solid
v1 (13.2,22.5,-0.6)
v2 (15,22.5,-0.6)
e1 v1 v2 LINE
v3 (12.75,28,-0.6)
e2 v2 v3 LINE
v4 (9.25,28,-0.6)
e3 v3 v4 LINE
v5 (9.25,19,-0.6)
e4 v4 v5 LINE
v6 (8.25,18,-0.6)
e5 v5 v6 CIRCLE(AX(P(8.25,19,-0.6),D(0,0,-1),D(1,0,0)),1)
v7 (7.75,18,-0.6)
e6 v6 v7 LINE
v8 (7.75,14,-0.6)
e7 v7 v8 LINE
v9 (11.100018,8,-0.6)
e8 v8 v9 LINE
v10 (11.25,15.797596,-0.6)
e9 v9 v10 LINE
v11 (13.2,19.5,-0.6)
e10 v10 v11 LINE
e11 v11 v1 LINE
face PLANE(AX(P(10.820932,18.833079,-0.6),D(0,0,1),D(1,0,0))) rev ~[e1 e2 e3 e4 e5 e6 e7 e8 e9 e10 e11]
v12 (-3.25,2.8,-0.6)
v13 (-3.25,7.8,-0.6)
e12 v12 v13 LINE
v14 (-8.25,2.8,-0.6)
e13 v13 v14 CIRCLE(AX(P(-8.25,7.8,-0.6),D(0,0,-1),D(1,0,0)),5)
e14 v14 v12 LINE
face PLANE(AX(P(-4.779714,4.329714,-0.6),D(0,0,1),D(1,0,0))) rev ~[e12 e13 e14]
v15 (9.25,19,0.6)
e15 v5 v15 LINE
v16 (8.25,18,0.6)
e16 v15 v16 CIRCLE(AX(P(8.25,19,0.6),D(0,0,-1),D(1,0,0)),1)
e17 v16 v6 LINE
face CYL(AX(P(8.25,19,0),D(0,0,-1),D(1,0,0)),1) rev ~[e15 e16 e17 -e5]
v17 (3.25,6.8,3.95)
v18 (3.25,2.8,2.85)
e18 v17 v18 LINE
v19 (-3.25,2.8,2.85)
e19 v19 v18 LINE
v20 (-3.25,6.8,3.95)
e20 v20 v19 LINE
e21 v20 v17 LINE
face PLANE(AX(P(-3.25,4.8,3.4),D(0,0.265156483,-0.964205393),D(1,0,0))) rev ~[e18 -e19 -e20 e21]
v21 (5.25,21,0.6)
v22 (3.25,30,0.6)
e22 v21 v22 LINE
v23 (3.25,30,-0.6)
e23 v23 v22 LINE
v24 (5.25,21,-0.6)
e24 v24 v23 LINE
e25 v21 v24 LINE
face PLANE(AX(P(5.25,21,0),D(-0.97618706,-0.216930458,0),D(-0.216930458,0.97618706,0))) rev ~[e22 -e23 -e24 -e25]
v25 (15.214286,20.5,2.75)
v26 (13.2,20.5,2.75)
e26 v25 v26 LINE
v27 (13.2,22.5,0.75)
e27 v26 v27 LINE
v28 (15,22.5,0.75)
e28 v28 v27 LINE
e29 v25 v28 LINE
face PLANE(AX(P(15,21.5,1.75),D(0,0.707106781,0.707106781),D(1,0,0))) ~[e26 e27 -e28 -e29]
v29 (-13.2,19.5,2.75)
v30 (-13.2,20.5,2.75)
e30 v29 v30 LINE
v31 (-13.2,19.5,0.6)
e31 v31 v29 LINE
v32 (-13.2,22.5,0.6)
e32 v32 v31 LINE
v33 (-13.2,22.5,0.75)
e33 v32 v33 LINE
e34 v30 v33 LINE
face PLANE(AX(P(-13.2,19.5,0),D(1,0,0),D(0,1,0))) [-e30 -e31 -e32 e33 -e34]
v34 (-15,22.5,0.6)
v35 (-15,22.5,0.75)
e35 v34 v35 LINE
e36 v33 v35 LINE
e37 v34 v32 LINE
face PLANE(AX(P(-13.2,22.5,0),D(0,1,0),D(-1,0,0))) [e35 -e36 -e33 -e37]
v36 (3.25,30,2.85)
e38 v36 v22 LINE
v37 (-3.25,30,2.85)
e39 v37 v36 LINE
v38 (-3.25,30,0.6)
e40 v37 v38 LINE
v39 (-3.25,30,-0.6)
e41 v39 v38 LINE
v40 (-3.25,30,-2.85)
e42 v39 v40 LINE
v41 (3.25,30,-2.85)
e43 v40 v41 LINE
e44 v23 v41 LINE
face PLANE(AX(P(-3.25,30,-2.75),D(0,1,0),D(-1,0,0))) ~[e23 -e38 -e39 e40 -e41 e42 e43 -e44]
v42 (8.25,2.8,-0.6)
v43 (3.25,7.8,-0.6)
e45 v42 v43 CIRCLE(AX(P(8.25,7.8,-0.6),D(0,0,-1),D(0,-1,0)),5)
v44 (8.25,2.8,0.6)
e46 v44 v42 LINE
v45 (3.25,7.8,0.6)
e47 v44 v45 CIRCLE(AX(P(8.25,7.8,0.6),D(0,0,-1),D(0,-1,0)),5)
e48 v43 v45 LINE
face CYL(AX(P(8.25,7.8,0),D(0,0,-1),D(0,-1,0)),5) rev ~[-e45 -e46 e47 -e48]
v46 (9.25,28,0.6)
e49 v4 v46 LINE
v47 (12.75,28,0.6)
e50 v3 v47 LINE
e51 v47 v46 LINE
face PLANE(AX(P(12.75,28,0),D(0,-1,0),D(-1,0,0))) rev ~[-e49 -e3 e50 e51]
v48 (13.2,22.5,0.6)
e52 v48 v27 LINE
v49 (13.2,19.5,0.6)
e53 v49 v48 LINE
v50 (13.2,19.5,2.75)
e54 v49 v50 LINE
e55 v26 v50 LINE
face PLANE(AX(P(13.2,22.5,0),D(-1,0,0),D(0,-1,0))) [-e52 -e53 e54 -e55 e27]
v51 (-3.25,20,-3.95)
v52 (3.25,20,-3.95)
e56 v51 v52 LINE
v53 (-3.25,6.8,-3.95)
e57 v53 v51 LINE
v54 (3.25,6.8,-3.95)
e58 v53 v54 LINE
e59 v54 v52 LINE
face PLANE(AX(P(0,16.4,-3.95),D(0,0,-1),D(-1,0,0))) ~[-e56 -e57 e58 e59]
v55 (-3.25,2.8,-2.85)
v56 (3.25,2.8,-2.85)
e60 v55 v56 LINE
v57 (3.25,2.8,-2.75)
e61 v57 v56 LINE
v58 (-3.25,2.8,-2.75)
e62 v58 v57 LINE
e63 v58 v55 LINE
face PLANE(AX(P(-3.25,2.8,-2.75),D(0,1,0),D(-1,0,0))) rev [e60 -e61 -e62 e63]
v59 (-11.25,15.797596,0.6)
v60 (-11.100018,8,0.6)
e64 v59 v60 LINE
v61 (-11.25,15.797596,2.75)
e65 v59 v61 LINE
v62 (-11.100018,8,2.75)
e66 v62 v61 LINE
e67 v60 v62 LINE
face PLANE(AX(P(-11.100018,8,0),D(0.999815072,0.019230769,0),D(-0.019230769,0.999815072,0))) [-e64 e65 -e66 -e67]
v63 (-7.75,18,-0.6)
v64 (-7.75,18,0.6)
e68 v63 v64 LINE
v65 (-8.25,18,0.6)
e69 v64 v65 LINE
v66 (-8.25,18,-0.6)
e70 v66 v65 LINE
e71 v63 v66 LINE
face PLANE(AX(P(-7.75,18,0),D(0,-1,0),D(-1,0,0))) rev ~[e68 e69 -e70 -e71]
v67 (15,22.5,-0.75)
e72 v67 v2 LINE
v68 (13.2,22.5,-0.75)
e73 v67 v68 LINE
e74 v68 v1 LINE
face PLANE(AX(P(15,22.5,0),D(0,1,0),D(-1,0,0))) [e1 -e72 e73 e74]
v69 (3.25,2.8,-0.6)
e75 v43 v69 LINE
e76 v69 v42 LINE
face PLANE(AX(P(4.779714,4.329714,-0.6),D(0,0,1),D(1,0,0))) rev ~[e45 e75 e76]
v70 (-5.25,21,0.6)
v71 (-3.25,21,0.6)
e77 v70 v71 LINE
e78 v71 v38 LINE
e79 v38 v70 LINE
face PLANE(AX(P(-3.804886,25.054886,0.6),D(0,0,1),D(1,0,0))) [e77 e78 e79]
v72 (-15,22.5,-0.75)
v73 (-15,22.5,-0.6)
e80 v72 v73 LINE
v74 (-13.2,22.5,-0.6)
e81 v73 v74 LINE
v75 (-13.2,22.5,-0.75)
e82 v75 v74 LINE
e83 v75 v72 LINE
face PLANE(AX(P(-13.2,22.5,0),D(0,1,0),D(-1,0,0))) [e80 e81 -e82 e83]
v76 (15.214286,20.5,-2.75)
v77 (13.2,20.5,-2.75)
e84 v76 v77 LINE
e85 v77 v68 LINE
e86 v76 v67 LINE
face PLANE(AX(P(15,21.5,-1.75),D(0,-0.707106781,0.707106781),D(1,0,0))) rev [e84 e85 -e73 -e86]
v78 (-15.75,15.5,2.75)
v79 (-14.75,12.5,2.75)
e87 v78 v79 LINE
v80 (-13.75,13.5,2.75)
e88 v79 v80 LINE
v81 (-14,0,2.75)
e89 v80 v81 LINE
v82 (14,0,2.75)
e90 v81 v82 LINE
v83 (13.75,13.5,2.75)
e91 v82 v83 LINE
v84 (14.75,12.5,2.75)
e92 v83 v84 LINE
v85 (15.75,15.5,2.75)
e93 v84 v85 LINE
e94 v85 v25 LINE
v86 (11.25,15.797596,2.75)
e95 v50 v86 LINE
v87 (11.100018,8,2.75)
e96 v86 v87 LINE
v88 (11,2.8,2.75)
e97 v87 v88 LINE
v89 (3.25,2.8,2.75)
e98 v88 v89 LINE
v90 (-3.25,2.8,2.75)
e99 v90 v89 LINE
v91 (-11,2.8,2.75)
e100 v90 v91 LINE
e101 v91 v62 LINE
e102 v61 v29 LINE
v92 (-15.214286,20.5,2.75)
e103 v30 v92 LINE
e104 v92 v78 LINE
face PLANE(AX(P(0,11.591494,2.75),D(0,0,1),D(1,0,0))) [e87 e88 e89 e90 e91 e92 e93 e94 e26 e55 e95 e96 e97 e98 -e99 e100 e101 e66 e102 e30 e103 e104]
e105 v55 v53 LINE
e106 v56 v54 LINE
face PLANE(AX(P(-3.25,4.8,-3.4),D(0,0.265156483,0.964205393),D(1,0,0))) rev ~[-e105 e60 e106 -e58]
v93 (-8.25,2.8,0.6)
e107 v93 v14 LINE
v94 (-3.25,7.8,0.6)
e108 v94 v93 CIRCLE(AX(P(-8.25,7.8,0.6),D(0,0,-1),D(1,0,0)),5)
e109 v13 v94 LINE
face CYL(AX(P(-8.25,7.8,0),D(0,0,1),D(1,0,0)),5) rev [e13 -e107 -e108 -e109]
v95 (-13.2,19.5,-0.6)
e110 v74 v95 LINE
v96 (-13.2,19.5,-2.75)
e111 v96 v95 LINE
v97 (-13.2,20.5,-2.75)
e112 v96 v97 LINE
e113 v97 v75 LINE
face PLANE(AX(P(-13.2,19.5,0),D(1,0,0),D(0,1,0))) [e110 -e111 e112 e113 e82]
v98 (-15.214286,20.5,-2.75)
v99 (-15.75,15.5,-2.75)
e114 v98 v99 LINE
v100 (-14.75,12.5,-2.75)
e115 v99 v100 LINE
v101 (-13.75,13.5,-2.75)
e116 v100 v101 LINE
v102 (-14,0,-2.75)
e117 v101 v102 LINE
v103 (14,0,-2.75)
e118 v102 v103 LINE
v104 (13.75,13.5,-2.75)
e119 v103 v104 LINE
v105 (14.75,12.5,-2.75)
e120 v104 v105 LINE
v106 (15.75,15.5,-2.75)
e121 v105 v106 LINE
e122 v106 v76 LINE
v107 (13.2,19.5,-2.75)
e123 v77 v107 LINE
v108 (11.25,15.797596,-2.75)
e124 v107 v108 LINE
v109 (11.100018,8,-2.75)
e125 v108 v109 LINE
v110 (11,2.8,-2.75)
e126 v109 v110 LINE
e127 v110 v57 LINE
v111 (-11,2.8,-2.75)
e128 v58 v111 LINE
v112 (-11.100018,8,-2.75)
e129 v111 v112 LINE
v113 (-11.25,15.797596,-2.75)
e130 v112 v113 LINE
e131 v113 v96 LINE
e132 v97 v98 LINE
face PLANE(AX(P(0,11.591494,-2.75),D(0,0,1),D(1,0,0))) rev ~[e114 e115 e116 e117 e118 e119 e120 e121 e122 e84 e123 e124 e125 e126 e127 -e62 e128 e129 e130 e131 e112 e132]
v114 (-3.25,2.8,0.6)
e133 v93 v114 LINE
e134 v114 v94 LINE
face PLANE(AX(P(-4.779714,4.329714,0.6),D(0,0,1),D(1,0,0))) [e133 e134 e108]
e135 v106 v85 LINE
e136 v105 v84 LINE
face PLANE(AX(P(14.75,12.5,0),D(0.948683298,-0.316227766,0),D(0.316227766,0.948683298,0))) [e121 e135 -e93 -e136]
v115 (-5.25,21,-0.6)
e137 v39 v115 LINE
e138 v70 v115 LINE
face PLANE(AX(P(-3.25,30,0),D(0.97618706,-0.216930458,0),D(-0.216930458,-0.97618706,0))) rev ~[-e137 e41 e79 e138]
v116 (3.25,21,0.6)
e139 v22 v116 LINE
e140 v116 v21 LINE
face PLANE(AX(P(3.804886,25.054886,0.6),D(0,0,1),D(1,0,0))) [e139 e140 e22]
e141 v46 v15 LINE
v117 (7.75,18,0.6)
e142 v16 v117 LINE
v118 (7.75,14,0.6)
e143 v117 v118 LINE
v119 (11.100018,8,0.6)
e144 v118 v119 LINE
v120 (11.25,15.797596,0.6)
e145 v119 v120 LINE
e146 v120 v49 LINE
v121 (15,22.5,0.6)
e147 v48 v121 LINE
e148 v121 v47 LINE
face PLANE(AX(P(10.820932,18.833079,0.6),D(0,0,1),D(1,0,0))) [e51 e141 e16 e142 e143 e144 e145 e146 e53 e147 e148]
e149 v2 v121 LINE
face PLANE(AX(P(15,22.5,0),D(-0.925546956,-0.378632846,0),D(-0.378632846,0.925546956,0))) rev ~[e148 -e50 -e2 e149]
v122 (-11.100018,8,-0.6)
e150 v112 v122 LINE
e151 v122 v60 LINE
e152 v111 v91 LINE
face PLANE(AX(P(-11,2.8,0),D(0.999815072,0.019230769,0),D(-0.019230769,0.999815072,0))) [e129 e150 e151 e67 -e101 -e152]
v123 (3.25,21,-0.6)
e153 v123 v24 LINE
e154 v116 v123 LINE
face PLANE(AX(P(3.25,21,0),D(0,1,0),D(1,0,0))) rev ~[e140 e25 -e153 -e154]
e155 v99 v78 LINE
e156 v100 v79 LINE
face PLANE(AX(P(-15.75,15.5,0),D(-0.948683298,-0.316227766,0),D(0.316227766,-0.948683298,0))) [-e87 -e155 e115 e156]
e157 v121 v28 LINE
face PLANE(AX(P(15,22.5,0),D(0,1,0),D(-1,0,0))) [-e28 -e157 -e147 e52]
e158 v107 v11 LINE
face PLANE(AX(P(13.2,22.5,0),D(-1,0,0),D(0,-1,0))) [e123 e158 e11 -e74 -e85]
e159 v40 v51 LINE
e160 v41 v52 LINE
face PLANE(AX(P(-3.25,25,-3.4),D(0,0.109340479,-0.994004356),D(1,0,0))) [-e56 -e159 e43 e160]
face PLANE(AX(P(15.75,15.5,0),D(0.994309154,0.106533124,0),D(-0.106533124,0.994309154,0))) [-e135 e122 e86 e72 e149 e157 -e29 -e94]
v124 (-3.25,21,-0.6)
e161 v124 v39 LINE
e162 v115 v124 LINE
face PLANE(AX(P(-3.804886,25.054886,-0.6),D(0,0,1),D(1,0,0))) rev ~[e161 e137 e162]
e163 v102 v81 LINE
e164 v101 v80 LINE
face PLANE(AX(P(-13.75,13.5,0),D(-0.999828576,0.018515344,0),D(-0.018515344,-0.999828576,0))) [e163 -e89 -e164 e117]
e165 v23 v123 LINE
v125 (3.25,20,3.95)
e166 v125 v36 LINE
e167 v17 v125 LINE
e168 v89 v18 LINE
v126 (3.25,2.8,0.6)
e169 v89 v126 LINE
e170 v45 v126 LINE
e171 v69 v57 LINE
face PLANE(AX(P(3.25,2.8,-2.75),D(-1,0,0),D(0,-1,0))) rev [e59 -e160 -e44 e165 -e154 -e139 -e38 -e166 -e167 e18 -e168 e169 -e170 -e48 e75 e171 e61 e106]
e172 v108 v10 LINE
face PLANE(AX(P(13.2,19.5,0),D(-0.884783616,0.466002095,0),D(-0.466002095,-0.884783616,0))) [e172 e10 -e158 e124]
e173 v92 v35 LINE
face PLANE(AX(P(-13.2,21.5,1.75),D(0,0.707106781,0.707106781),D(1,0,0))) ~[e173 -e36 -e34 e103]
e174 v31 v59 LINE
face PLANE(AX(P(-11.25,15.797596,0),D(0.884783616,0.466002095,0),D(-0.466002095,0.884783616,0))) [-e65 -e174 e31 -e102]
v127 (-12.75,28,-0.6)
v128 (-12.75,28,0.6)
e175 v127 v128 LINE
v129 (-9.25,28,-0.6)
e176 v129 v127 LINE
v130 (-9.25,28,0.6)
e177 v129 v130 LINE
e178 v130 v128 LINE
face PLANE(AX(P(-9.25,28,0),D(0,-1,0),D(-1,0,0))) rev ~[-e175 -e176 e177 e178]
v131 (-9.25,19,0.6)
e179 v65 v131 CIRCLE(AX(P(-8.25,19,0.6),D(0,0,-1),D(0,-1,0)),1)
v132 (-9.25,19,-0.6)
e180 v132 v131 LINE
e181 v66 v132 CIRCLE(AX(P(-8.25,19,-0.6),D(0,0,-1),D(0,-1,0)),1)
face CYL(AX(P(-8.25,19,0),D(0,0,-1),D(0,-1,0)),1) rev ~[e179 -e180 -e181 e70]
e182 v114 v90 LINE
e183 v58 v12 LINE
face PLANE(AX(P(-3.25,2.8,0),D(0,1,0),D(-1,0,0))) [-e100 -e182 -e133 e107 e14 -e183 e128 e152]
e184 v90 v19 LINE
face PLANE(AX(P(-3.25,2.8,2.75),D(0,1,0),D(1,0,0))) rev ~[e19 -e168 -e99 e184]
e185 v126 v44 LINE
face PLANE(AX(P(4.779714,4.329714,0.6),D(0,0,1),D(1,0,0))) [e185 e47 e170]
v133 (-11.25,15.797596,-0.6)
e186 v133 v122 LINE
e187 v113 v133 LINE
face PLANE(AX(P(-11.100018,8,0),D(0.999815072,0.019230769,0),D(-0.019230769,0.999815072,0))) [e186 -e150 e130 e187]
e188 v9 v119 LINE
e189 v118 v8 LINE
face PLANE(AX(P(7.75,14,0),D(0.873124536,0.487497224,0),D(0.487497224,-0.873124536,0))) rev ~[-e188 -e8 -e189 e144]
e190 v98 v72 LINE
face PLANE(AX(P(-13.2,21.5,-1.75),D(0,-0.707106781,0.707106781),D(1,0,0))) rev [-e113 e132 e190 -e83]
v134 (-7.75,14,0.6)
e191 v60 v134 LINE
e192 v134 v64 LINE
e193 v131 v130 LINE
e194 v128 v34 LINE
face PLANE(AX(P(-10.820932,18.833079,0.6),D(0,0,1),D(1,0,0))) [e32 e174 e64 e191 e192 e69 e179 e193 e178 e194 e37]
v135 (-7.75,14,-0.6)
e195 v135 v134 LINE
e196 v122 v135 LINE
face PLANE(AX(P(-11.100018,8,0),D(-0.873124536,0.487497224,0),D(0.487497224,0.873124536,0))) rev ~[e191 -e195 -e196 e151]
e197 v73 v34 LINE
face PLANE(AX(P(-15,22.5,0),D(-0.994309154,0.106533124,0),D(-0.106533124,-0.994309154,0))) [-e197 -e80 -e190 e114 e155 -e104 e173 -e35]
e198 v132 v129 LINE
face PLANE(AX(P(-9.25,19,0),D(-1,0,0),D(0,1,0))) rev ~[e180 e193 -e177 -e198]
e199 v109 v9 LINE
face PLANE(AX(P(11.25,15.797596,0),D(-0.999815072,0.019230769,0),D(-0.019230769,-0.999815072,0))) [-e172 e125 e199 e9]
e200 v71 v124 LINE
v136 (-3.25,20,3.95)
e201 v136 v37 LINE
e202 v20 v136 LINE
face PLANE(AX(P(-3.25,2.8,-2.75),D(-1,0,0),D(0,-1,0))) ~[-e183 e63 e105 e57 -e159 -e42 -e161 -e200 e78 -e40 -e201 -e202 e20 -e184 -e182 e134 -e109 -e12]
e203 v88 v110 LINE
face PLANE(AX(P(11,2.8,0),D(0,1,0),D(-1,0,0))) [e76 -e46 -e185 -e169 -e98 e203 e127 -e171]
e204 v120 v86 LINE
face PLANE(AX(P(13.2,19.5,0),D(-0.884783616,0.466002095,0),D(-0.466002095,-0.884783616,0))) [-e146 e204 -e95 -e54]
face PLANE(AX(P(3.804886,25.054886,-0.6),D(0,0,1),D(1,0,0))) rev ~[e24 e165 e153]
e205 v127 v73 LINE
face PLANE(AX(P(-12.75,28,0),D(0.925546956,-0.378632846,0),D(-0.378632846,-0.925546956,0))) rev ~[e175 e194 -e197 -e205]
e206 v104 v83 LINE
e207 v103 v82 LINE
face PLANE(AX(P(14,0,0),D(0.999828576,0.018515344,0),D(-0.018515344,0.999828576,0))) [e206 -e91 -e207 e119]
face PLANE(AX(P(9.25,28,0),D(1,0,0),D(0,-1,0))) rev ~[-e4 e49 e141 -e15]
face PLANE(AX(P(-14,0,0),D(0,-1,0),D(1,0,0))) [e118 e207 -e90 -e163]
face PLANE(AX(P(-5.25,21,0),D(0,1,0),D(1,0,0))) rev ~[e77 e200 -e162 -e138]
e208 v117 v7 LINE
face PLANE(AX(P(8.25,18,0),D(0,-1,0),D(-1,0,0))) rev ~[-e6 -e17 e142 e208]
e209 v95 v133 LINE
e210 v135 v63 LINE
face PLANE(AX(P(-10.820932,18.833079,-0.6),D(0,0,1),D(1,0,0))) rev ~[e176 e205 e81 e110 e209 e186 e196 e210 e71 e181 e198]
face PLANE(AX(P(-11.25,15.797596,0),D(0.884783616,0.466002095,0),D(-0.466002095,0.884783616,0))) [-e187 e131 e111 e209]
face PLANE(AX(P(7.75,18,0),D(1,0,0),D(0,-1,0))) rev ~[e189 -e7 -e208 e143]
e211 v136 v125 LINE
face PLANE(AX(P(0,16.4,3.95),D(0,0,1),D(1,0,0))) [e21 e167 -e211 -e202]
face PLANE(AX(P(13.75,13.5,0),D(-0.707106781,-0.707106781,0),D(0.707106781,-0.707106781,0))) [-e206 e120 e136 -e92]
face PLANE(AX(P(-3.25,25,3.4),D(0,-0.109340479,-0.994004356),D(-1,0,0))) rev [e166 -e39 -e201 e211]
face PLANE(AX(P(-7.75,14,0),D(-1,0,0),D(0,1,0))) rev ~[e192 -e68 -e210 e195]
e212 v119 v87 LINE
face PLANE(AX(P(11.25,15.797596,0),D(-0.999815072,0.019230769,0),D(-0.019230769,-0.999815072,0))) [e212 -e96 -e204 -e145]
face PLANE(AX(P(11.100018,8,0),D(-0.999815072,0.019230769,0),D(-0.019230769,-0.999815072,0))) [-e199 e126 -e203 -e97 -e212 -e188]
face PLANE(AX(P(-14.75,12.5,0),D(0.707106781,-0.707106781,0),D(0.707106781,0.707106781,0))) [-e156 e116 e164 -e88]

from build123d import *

# Parameters (mm, degrees)
F1_DEPTH    = 2.75
F2_DEPTH    = 0.6
F3_SIZE     = 2
F4_W        = 6.5
F4_H        = 27.2
F5_DEPTH    = 1.2
F6_C1_SIZE2 = 4
F6_C1_SIZE  = 1.1
F6_C2_SIZE2 = 1.1
F6_C2_SIZE  = 4
F7_C1_SIZE2 = 1.1
F7_C1_SIZE  = 10
F7_C2_SIZE2 = 10
F7_C2_SIZE  = 1.1


# Not quite as in the source:
# - a pattern or mirror of a feature is missing from the dataset's text; its kind, count and spacing are read off the source's solid


with BuildPart() as f1:
    # F0 (on Top) → F1 (new body, symmetric)
    with BuildSketch(Plane.XY):
        Polygon((3.25, 30), (0, 30), (-3.25, 30), (-3.25, 21), (-3.25, 7.8), (-3.25, 2.8), (-8.25, 2.8), (-11, 2.8), (-11.1000184963, 8), (-11.25, 15.7975959316), (-13.2, 19.5), (-13.2, 22.5), (-15, 22.5), (-15.75, 15.5), (-14.75, 12.5), (-13.75, 13.5), (-14, 0), (0, 0), (14, 0), (13.75, 13.5), (14.75, 12.5), (15.75, 15.5), (15, 22.5), (13.2, 22.5), (13.2, 19.5), (11.25, 15.7975959316), (11.1000184963, 8), (11, 2.8), (8.25, 2.8), (3.25, 2.8), (3.25, 7.8), (3.25, 21), align=None)
    extrude(amount=F1_DEPTH, both=True)

    # F0 (on Top) → F2 (join, symmetric)
    with BuildSketch(Plane.XY):
        with BuildLine():
            Line((-11.25, 15.7975959316), (-11.1000184963, 8))
            Line((-11.1000184963, 8), (-7.75, 14))
            Line((-7.75, 14), (-7.75, 18))
            Line((-7.75, 18), (-8.25, 18))
            ThreePointArc((-8.25, 18), (-8.9571067812, 18.2928932188), (-9.25, 19))
            Line((-9.25, 19), (-9.25, 28))
            Line((-9.25, 28), (-12.75, 28))
            Line((-12.75, 28), (-15, 22.5))
            Line((-15, 22.5), (-13.2, 22.5))
            Line((-13.2, 22.5), (-13.2, 19.5))
            Line((-13.2, 19.5), (-11.25, 15.7975959316))
        make_face()
        Polygon((-3.25, 21), (-3.25, 30), (-5.25, 21), align=None)
        Polygon((5.25, 21), (3.25, 30), (3.25, 21), align=None)
        with BuildLine():
            Line((7.75, 14), (11.1000184963, 8))
            Line((11.1000184963, 8), (11.25, 15.7975959316))
            Line((11.25, 15.7975959316), (13.2, 19.5))
            Line((13.2, 19.5), (13.2, 22.5))
            Line((13.2, 22.5), (15, 22.5))
            Line((15, 22.5), (12.75, 28))
            Line((12.75, 28), (9.25, 28))
            Line((9.25, 28), (9.25, 19))
            ThreePointArc((9.25, 19), (8.9571067812, 18.2928932188), (8.25, 18))
            Line((8.25, 18), (7.75, 18))
            Line((7.75, 18), (7.75, 14))
        make_face()
        with BuildLine():
            ThreePointArc((8.25, 2.8), (4.7144660941, 4.2644660941), (3.25, 7.8))
            Line((3.25, 7.8), (3.25, 2.8))
            Line((3.25, 2.8), (8.25, 2.8))
        make_face()
        with BuildLine():
            Line((-3.25, 2.8), (-3.25, 7.8))
            ThreePointArc((-3.25, 7.8), (-4.7144660941, 4.2644660941), (-8.25, 2.8))
            Line((-8.25, 2.8), (-3.25, 2.8))
        make_face()
    extrude(amount=F2_DEPTH, both=True)

    # F3
    f3_edges = [f1.edges().sort_by_distance(p)[0] for p in [
        (14.1, 22.5, 2.75),
        (14.1, 22.5, -2.75),
        (-14.1, 22.5, 2.75),
        (-14.1, 22.5, -2.75),
    ]]
    chamfer(f3_edges, length=F3_SIZE)

    # F4 (on face) → F5 (join)
    with BuildSketch(Plane.XY.offset(2.75)):
        with Locations((0, 16.4)):
            Rectangle(F4_W, F4_H)
    f5 = extrude(amount=F5_DEPTH)

    # F5_copies: F5 across plane
    add(f5.mirror(Plane(origin=(0, 0, 0), x_dir=(-1, 0, 0), z_dir=(0, 0, -1))))

    # F6: chamfer of 4 x 1.1 on 2 edges, made by hand

    # F6_c1
    f6_c1_edges = [f1.edges().sort_by_distance(p)[0] for p in [
        (0, 2.8, -3.95),
    ]]
    f6_c1_side = f1.faces().sort_by_distance((0, 2.8, -3.928))[0]
    chamfer(f6_c1_edges, length=F6_C1_SIZE, length2=F6_C1_SIZE2, reference=f6_c1_side)

    # F6_c2
    f6_c2_edges = [f1.edges().sort_by_distance(p)[0] for p in [
        (0, 2.8, 3.95),
    ]]
    f6_c2_side = f1.faces().sort_by_distance((0, 2.822, 3.95))[0]
    chamfer(f6_c2_edges, length=F6_C2_SIZE, length2=F6_C2_SIZE2, reference=f6_c2_side)

    # F7: chamfer of 1.1 x 10 on 2 edges, made by hand

    # F7_c1
    f7_c1_edges = [f1.edges().sort_by_distance(p)[0] for p in [
        (0, 30, 3.95),
    ]]
    f7_c1_side = f1.faces().sort_by_distance((0, 29.978, 3.95))[0]
    chamfer(f7_c1_edges, length=F7_C1_SIZE, length2=F7_C1_SIZE2, reference=f7_c1_side)

    # F7_c2
    f7_c2_edges = [f1.edges().sort_by_distance(p)[0] for p in [
        (0, 30, -3.95),
    ]]
    f7_c2_side = f1.faces().sort_by_distance((0, 30, -3.928))[0]
    chamfer(f7_c2_edges, length=F7_C2_SIZE, length2=F7_C2_SIZE2, reference=f7_c2_side)


solid = f1.part
